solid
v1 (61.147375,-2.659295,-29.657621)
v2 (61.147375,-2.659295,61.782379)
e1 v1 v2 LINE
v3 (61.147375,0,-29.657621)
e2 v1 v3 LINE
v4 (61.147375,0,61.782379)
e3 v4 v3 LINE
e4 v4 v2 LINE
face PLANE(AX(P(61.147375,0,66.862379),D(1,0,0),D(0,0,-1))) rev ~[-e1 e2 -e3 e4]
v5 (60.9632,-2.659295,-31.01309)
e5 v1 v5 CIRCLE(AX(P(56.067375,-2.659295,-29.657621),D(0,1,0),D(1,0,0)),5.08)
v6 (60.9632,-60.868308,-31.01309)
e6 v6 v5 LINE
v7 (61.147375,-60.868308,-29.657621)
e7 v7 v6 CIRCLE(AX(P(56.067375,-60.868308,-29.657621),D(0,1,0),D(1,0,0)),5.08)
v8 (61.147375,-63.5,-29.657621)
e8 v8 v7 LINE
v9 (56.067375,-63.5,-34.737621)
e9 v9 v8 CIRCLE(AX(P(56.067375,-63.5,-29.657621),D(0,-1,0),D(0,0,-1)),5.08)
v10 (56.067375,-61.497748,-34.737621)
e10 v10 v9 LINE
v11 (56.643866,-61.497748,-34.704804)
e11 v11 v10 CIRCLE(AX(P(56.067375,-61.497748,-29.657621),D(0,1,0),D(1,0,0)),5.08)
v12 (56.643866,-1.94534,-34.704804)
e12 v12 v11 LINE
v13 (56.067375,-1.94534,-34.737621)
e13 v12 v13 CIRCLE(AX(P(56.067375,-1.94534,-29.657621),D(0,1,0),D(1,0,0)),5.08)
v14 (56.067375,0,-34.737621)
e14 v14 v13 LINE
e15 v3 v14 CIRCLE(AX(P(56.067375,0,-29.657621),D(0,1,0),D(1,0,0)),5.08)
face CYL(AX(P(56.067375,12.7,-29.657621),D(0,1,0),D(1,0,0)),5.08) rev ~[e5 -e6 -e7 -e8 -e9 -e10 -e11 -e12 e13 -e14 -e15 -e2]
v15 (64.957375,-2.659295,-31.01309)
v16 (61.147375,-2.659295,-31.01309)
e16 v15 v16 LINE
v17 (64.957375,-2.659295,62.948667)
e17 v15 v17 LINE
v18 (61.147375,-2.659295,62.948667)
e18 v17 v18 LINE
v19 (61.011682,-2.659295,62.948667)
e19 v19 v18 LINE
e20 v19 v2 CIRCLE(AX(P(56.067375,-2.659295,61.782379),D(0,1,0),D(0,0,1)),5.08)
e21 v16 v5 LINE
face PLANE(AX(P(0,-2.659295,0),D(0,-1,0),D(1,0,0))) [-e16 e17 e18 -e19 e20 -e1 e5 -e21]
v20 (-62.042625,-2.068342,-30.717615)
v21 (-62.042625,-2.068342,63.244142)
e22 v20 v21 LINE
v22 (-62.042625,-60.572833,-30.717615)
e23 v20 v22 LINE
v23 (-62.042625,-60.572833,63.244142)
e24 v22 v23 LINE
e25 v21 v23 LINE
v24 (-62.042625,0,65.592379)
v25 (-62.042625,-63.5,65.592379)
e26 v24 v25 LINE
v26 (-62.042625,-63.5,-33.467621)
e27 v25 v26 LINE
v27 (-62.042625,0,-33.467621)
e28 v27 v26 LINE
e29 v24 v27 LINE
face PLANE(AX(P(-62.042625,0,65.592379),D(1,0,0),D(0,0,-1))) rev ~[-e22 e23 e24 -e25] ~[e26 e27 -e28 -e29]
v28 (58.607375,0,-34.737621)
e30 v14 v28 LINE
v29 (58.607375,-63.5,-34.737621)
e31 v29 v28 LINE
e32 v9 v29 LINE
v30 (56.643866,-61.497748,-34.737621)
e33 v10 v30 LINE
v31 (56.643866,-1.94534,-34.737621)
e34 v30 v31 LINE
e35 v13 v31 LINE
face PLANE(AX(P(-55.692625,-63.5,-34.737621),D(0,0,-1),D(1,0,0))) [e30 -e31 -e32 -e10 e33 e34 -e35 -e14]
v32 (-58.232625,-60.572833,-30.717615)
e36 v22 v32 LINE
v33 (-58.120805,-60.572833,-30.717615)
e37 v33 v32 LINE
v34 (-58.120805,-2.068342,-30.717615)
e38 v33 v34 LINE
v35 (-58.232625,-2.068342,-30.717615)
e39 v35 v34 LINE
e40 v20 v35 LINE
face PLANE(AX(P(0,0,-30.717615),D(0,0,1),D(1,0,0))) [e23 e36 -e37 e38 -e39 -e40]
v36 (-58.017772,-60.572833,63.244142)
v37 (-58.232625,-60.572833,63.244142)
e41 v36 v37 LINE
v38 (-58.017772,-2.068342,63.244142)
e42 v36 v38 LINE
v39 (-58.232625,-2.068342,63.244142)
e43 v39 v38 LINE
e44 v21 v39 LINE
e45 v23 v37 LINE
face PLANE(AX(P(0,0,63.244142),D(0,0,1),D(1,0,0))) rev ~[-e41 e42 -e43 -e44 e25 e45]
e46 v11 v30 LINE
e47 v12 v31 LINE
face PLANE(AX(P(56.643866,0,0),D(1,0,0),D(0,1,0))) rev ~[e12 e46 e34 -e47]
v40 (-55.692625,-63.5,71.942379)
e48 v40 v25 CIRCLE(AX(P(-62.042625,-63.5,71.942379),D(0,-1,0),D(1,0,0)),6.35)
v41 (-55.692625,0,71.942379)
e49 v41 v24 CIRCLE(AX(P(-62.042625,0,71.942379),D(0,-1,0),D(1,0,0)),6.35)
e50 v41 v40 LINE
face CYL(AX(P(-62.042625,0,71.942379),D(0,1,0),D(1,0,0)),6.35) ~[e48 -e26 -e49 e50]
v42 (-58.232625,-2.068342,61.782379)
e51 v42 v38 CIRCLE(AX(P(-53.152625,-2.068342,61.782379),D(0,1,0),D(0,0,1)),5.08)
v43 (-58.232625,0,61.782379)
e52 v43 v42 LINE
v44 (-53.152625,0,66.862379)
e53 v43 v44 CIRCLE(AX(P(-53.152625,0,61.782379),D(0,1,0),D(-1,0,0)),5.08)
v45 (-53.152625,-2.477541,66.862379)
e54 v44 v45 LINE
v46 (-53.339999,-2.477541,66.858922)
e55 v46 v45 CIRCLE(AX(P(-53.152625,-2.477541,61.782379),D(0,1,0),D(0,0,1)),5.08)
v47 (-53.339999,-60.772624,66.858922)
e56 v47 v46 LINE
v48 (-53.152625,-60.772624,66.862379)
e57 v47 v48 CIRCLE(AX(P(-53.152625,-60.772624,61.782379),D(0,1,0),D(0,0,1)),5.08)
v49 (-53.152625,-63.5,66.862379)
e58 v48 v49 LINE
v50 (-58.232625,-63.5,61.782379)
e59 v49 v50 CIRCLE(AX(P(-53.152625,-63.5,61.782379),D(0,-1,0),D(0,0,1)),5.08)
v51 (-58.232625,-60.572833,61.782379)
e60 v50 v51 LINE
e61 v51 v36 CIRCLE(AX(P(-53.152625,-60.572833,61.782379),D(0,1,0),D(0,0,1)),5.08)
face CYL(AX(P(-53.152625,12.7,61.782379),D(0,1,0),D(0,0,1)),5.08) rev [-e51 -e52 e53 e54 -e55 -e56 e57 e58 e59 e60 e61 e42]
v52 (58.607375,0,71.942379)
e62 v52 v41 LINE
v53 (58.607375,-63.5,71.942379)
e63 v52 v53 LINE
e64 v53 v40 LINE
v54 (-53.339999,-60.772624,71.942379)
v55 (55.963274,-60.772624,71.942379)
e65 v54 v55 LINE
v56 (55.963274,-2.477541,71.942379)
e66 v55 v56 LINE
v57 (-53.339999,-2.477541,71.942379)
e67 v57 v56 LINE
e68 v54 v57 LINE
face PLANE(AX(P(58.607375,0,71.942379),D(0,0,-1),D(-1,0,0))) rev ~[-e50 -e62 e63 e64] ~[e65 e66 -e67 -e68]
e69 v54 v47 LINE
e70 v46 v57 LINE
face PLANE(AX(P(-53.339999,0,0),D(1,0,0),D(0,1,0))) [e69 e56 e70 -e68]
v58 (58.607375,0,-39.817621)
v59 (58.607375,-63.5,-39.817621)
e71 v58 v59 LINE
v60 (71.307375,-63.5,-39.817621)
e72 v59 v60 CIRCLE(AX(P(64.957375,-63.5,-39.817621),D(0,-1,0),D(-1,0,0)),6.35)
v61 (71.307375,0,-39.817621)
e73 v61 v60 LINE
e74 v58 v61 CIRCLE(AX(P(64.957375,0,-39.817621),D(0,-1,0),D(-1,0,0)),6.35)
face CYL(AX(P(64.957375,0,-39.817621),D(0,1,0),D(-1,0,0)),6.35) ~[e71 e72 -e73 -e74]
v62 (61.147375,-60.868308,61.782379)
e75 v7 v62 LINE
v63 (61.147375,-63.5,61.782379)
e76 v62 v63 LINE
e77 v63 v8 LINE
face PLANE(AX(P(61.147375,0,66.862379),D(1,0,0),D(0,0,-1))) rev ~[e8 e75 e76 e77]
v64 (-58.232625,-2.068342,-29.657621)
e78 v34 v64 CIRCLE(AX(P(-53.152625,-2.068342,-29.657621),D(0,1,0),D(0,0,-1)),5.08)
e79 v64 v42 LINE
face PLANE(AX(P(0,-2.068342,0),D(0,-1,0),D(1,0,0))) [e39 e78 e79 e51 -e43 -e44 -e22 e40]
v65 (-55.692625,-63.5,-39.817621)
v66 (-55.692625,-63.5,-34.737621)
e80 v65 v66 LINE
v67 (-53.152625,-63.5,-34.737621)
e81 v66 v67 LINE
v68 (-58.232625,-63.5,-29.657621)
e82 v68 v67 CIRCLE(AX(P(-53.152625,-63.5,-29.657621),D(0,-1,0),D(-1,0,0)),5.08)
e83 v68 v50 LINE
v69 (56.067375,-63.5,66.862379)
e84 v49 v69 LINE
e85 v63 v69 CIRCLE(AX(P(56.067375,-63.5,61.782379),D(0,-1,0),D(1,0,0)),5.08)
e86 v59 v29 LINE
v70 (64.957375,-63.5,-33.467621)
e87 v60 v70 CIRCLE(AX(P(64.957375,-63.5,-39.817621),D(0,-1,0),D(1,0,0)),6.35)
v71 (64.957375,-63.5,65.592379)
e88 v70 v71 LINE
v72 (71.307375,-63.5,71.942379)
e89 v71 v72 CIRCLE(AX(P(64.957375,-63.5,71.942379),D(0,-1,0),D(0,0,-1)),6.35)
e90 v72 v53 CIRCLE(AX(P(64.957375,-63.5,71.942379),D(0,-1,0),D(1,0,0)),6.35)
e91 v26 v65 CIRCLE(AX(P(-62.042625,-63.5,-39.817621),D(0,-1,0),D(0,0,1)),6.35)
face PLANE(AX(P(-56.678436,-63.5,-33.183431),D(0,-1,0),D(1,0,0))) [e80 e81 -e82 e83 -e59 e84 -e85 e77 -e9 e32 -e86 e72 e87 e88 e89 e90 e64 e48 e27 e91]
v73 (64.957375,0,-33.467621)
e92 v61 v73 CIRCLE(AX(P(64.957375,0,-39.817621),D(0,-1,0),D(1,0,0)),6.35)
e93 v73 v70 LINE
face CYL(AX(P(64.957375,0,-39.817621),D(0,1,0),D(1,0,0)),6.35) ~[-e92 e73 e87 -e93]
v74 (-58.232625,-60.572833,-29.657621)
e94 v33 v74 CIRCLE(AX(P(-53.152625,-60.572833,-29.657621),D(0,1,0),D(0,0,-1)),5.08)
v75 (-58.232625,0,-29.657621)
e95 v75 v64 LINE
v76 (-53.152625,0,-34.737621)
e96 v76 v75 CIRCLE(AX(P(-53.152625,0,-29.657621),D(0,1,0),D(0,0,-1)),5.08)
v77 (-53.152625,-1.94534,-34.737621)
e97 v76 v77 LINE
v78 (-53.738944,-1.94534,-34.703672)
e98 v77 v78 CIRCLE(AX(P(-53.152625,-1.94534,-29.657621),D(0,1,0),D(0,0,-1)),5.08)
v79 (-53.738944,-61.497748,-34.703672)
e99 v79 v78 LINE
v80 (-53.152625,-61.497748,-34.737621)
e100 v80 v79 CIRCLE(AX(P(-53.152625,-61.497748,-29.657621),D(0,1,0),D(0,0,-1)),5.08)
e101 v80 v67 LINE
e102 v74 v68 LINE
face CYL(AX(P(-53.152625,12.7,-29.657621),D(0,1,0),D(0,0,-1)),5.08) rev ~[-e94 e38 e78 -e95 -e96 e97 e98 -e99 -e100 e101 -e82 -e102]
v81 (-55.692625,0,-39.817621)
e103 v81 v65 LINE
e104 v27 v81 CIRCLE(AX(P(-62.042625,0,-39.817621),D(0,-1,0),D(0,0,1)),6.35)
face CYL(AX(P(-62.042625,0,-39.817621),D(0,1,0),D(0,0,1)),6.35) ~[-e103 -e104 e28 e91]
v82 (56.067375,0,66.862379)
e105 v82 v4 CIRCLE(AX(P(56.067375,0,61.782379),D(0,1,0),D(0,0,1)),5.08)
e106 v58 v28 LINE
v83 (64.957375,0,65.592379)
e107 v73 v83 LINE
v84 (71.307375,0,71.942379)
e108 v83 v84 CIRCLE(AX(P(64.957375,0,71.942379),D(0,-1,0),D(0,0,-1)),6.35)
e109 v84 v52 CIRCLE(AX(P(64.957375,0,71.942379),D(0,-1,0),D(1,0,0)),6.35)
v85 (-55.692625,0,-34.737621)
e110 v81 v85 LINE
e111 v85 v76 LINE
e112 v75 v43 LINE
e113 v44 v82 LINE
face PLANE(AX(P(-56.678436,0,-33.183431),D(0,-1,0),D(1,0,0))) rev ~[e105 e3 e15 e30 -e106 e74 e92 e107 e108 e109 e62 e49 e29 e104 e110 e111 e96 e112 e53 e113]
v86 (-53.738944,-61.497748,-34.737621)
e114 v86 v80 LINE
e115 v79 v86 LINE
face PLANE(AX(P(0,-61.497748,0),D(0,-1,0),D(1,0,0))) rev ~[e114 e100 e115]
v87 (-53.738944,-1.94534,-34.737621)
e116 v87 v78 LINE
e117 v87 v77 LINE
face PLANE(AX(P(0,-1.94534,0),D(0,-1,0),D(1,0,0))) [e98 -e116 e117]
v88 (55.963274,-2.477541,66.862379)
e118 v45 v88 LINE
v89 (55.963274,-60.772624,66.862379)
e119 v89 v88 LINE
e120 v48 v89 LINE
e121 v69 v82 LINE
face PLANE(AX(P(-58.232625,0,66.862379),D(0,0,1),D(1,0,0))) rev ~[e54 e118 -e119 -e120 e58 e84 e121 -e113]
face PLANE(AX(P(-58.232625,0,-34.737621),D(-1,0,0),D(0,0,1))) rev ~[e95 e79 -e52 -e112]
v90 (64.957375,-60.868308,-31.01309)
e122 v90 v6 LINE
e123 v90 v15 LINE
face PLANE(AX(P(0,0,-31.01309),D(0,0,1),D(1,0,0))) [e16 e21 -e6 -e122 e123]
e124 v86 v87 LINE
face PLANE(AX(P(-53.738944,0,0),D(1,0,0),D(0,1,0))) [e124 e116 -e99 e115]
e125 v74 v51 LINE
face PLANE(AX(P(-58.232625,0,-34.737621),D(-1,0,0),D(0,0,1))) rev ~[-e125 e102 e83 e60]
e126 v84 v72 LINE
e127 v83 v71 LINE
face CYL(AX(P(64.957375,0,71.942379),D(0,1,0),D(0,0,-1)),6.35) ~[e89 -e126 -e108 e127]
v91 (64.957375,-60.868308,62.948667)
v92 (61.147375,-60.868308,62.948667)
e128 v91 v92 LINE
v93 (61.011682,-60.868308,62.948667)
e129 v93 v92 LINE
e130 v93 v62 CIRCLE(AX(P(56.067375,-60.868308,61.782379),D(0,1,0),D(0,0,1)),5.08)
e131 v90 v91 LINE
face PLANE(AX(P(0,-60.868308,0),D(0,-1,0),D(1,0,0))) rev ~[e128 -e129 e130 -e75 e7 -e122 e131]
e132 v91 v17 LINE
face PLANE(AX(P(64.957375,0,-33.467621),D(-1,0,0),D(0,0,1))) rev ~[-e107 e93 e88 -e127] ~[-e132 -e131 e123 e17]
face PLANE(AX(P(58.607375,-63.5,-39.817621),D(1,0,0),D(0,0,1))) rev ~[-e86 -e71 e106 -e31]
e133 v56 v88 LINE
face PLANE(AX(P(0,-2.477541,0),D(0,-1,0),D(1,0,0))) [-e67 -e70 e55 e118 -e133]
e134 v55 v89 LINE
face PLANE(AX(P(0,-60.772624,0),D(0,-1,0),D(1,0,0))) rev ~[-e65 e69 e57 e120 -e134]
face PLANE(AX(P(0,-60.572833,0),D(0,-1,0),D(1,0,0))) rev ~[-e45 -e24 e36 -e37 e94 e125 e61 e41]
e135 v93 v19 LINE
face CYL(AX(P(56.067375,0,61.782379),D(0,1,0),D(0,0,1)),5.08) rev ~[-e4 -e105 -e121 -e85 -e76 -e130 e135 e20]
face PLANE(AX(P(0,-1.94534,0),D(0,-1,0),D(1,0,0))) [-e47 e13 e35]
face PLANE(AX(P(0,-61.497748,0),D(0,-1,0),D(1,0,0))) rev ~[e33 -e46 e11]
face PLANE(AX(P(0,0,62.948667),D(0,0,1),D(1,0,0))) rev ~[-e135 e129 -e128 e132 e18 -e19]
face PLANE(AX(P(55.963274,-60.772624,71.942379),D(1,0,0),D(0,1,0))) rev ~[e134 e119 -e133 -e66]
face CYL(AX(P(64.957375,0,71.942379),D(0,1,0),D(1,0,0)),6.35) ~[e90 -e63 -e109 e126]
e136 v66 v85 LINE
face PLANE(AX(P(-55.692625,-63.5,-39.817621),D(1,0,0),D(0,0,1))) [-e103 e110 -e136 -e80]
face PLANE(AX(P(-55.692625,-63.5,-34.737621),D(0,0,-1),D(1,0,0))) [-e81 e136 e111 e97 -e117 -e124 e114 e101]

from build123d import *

# Parameters (mm, degrees)
F1_DEPTH       = 63.5
F2_W           = 110.382810235
F2_H           = 59.5524079399
F3_DEPTH       = 25.4
F4_W           = 58.5044906475
F4_H           = 93.9617566764
F5_DEPTH       = 64.77
F6_W           = 109.3032732606
F6_H           = 58.2950827666
F7_DEPTH       = 52.832
F8_W           = 58.2090124954
F8_H           = 93.9617566764
F9_DEPTH       = 43.434
F10_T4_DEPTH   = 63.5
F10_T9_DEPTH   = 76.2
F10_T14_DEPTH  = 76.2
F10_T19_DEPTH  = 76.2
F10_T25_DEPTH  = 76.2
F10_T30_DEPTH  = 76.2
F10_T37_DEPTH  = 76.2
F10_T42_DEPTH  = 88.9
F10_T49_DEPTH  = 76.2
F10_T55_DEPTH  = 76.2
F10_T60_DEPTH  = 76.2
F10_T67_DEPTH  = 76.2
F10_T73_DEPTH  = 76.2
F10_T78_DEPTH  = 76.2
F10_T83_DEPTH  = 76.2
F10_T90_DEPTH  = 88.9
F10_T97_DEPTH  = 76.2
F10_T102_DEPTH = 88.9
F11_W          = 114.3
F11_H          = 5.08
F12_DEPTH      = 127.254


# Not quite as in the source:
# - a fillet or chamfer that OpenCascade refuses, or shapes differently, is made with other operations: its cross-section is extruded or revolved along the edge and cut away or added


with BuildPart() as f1:
    # F0 (on Front) → F1 (new body)
    with BuildSketch(Plane.XZ):
        with BuildLine():
            Line((-62.042625457, -33.4676207812), (-62.042625457, -39.8176207812))
            Line((-62.042625457, -39.8176207812), (-55.692625457, -39.8176207812))
            ThreePointArc((-55.692625457, -39.8176207812), (-56.3630127942, -36.9778144498), (-58.232625457, -34.7376207812))
            ThreePointArc((-58.232625457, -34.7376207812), (-60.0345791428, -33.7934818386), (-62.042625457, -33.4676207812))
        make_face()
        with BuildLine():
            Line((-55.692625457, -39.8176207812), (-62.042625457, -39.8176207812))
            Line((-62.042625457, -39.8176207812), (-62.042625457, -33.4676207812))
            ThreePointArc((-62.042625457, -33.4676207812), (-66.5327535176, -44.3077488417), (-55.692625457, -39.8176207812))
        make_face()
        with BuildLine():
            ThreePointArc((-58.232625457, -34.7376207812), (-56.3630127942, -36.9778144498), (-55.692625457, -39.8176207812))
            Line((-55.692625457, -39.8176207812), (58.607374543, -39.8176207812))
            ThreePointArc((58.607374543, -39.8176207812), (59.2777618801, -36.9778144498), (61.147374543, -34.7376207812))
            Line((61.147374543, -34.7376207812), (-58.232625457, -34.7376207812))
        make_face()
        with BuildLine():
            Line((-62.042625457, 65.5923792188), (-62.042625457, -33.4676207812))
            ThreePointArc((-62.042625457, -33.4676207812), (-60.0345791428, -33.7934818386), (-58.232625457, -34.7376207812))
            Line((-58.232625457, -34.7376207812), (-58.232625457, 66.8623792188))
            ThreePointArc((-58.232625457, 66.8623792188), (-60.0345791428, 65.9182402762), (-62.042625457, 65.5923792188))
        make_face()
        with BuildLine():
            ThreePointArc((61.147374543, -34.7376207812), (59.2777618801, -36.9778144498), (58.607374543, -39.8176207812))
            Line((58.607374543, -39.8176207812), (64.957374543, -39.8176207812))
            Line((64.957374543, -39.8176207812), (64.957374543, -33.4676207812))
            ThreePointArc((64.957374543, -33.4676207812), (62.9493282287, -33.7934818386), (61.147374543, -34.7376207812))
        make_face()
        with BuildLine():
            Line((64.957374543, -39.8176207812), (58.607374543, -39.8176207812))
            ThreePointArc((58.607374543, -39.8176207812), (64.957374543, -46.1676207812), (71.307374543, -39.8176207812))
            ThreePointArc((71.307374543, -39.8176207812), (69.4475026035, -35.3274927207), (64.957374543, -33.4676207812))
            Line((64.957374543, -33.4676207812), (64.957374543, -39.8176207812))
        make_face()
        with BuildLine():
            ThreePointArc((-55.692625457, 71.9423792188), (-66.5327535176, 76.4325072793), (-62.042625457, 65.5923792188))
            Line((-62.042625457, 65.5923792188), (-62.042625457, 71.9423792188))
            Line((-62.042625457, 71.9423792188), (-55.692625457, 71.9423792188))
        make_face()
        with BuildLine():
            Line((-62.042625457, 71.9423792188), (-62.042625457, 65.5923792188))
            ThreePointArc((-62.042625457, 65.5923792188), (-60.0345791428, 65.9182402762), (-58.232625457, 66.8623792188))
            ThreePointArc((-58.232625457, 66.8623792188), (-56.3630127942, 69.1025728874), (-55.692625457, 71.9423792188))
            Line((-55.692625457, 71.9423792188), (-62.042625457, 71.9423792188))
        make_face()
        with BuildLine():
            Line((61.147374543, 66.8623792188), (61.147374543, -34.7376207812))
            ThreePointArc((61.147374543, -34.7376207812), (62.9493282287, -33.7934818386), (64.957374543, -33.4676207812))
            Line((64.957374543, -33.4676207812), (64.957374543, 65.5923792188))
            ThreePointArc((64.957374543, 65.5923792188), (62.9493282287, 65.9182402762), (61.147374543, 66.8623792188))
        make_face()
        with BuildLine():
            ThreePointArc((-55.692625457, 71.9423792188), (-56.3630127942, 69.1025728874), (-58.232625457, 66.8623792188))
            Line((-58.232625457, 66.8623792188), (61.147374543, 66.8623792188))
            ThreePointArc((61.147374543, 66.8623792188), (59.2777618801, 69.1025728874), (58.607374543, 71.9423792188))
            Line((58.607374543, 71.9423792188), (-55.692625457, 71.9423792188))
        make_face()
        with BuildLine():
            ThreePointArc((58.607374543, 71.9423792188), (59.2777618801, 69.1025728874), (61.147374543, 66.8623792188))
            ThreePointArc((61.147374543, 66.8623792188), (62.9493282287, 65.9182402762), (64.957374543, 65.5923792188))
            Line((64.957374543, 65.5923792188), (64.957374543, 71.9423792188))
            Line((64.957374543, 71.9423792188), (58.607374543, 71.9423792188))
        make_face()
        with BuildLine():
            ThreePointArc((71.307374543, 71.9423792188), (64.957374543, 78.2923792188), (58.607374543, 71.9423792188))
            Line((58.607374543, 71.9423792188), (64.957374543, 71.9423792188))
            Line((64.957374543, 71.9423792188), (64.957374543, 65.5923792188))
            ThreePointArc((64.957374543, 65.5923792188), (69.4475026035, 67.4522511583), (71.307374543, 71.9423792188))
        make_face()
    extrude(amount=F1_DEPTH)

    # F2 (on face) → F3 (cut)
    with BuildSketch(Plane(origin=(0, 0, -39.8176207812), x_dir=(1, 0, 0), z_dir=(0, 0, -1))):
        with Locations((1.452460885, 31.7215439281)):
            Rectangle(F2_W, F2_H)
    extrude(amount=-F3_DEPTH, mode=Mode.SUBTRACT)

    # F4 (on face) → F5 (cut)
    with BuildSketch(Plane(origin=(-62.042625457, 0, 0), x_dir=(0, -1, 0), z_dir=(-1, 0, 0))):
        with Locations((31.3205874991, 16.2632633001)):
            Rectangle(F4_W, F4_H)
    extrude(amount=-F5_DEPTH, mode=Mode.SUBTRACT)

    # F6 (on face) → F7 (cut)
    with BuildSketch(Plane.XY.offset(71.9423792188)):
        with Locations((1.3116374612, -31.6250824835)):
            Rectangle(F6_W, F6_H)
    extrude(amount=-F7_DEPTH, mode=Mode.SUBTRACT)

    # F8 (on face) → F9 (cut)
    with BuildSketch(Plane.YZ.offset(64.957374543)):
        with Locations((-31.7638017004, 15.9677881747)):
            Rectangle(F8_W, F8_H)
    extrude(amount=-F9_DEPTH, mode=Mode.SUBTRACT)

    # F10: fillet of radius 5.08 on 4 edges, made by hand


with BuildPart() as f10_tool2:
    # F10_s3 → F10_t4 (new body)
    with BuildSketch(Plane.XZ):
        with BuildLine():
            ThreePointArc((56.067374543, 66.8623792188), (59.6594769914, 65.3744816672), (61.147374543, 61.7823792188))
            Line((61.147374543, 61.7823792188), (61.147374543, 66.8623792188))
            Line((61.147374543, 66.8623792188), (56.067374543, 66.8623792188))
        make_face()
    extrude(amount=F10_T4_DEPTH)

    split(bisect_by=Plane.XY.offset(62.948666513), keep=Keep.TOP)


with BuildPart() as f1_1:
    add(f1.part)

    # F10_t1: union F10_tool2
    add(f10_tool2.part)


with BuildPart() as f10_tool7:
    # F10_s8 → F10_t9 (new body)
    with BuildSketch(Plane.XZ):
        with BuildLine():
            ThreePointArc((56.067374543, 66.8623792188), (59.6594769914, 65.3744816672), (61.147374543, 61.7823792188))
            Line((61.147374543, 61.7823792188), (61.147374543, 66.8623792188))
            Line((61.147374543, 66.8623792188), (56.067374543, 66.8623792188))
        make_face()
    extrude(amount=F10_T9_DEPTH)

    split(bisect_by=Plane.XZ.offset(2.6592954528), keep=Keep.BOTTOM)


with BuildPart() as f1_2:
    add(f1_1.part)

    # F10_t6: union F10_tool7
    add(f10_tool7.part)


with BuildPart() as f10_tool12:
    # F10_s13 → F10_t14 (new body)
    with BuildSketch(Plane.XZ.offset(-12.7)):
        with BuildLine():
            ThreePointArc((56.067374543, 66.8623792188), (59.6594769914, 65.3744816672), (61.147374543, 61.7823792188))
            Line((61.147374543, 61.7823792188), (61.147374543, 66.8623792188))
            Line((61.147374543, 66.8623792188), (56.067374543, 66.8623792188))
        make_face()
    extrude(amount=F10_T14_DEPTH)

    split(bisect_by=Plane.XZ.offset(60.8683079481), keep=Keep.TOP)


with BuildPart() as f1_3:
    add(f1_2.part)

    # F10_t11: union F10_tool12
    add(f10_tool12.part)


with BuildPart() as f10_tool17:
    # F10_s18 → F10_t19 (new body)
    with BuildSketch(Plane.XZ):
        with BuildLine():
            ThreePointArc((-53.152625457, 66.8623792188), (-56.7447279055, 65.3744816672), (-58.232625457, 61.7823792188))
            Line((-58.232625457, 61.7823792188), (-58.232625457, 66.8623792188))
            Line((-58.232625457, 66.8623792188), (-53.152625457, 66.8623792188))
        make_face()
    extrude(amount=F10_T19_DEPTH)

    split(bisect_by=Plane.XZ.offset(2.4775411002), keep=Keep.BOTTOM)

    split(bisect_by=Plane.XY.offset(63.2441416383), keep=Keep.TOP)


with BuildPart() as f1_4:
    add(f1_3.part)

    # F10_t16: union F10_tool17
    add(f10_tool17.part)


with BuildPart() as f10_tool23:
    # F10_s24 → F10_t25 (new body)
    with BuildSketch(Plane.XZ):
        with BuildLine():
            ThreePointArc((-53.152625457, 66.8623792188), (-56.7447279055, 65.3744816672), (-58.232625457, 61.7823792188))
            Line((-58.232625457, 61.7823792188), (-58.232625457, 66.8623792188))
            Line((-58.232625457, 66.8623792188), (-53.152625457, 66.8623792188))
        make_face()
    extrude(amount=F10_T25_DEPTH)

    split(bisect_by=Plane.XZ.offset(2.0683421753), keep=Keep.BOTTOM)


with BuildPart() as f1_5:
    add(f1_4.part)

    # F10_t22: union F10_tool23
    add(f10_tool23.part)


with BuildPart() as f10_tool28:
    # F10_s29 → F10_t30 (new body)
    with BuildSketch(Plane.XZ.offset(-12.7)):
        with BuildLine():
            ThreePointArc((-53.152625457, 66.8623792188), (-56.7447279055, 65.3744816672), (-58.232625457, 61.7823792188))
            Line((-58.232625457, 61.7823792188), (-58.232625457, 66.8623792188))
            Line((-58.232625457, 66.8623792188), (-53.152625457, 66.8623792188))
        make_face()
    extrude(amount=F10_T30_DEPTH)

    split(bisect_by=Plane.YZ.offset(-53.3399991691), keep=Keep.BOTTOM)

    split(bisect_by=Plane.XZ.offset(2.0683421753), keep=Keep.TOP)

    split(bisect_by=Plane.XY.offset(63.2441416383), keep=Keep.TOP)


with BuildPart() as f1_6:
    add(f1_5.part)

    # F10_t27: union F10_tool28
    add(f10_tool28.part)


with BuildPart() as f10_tool35:
    # F10_s36 → F10_t37 (new body)
    with BuildSketch(Plane.XZ.offset(-12.7)):
        with BuildLine():
            ThreePointArc((-53.152625457, 66.8623792188), (-56.7447279055, 65.3744816672), (-58.232625457, 61.7823792188))
            Line((-58.232625457, 61.7823792188), (-58.232625457, 66.8623792188))
            Line((-58.232625457, 66.8623792188), (-53.152625457, 66.8623792188))
        make_face()
    extrude(amount=F10_T37_DEPTH)

    split(bisect_by=Plane.XZ.offset(60.7726238668), keep=Keep.TOP)


with BuildPart() as f1_7:
    add(f1_6.part)

    # F10_t34: union F10_tool35
    add(f10_tool35.part)


with BuildPart() as f10_tool40:
    # F10_s41 → F10_t42 (new body)
    with BuildSketch(Plane.XZ.offset(-12.7)):
        with BuildLine():
            ThreePointArc((-53.152625457, 66.8623792188), (-56.7447279055, 65.3744816672), (-58.232625457, 61.7823792188))
            Line((-58.232625457, 61.7823792188), (-58.232625457, 66.8623792188))
            Line((-58.232625457, 66.8623792188), (-53.152625457, 66.8623792188))
        make_face()
    extrude(amount=F10_T42_DEPTH)

    split(bisect_by=Plane.XZ.offset(60.7726238668), keep=Keep.BOTTOM)

    split(bisect_by=Plane.XZ.offset(60.5728328228), keep=Keep.TOP)

    split(bisect_by=Plane.XY.offset(63.2441416383), keep=Keep.BOTTOM)


with BuildPart() as f1_8:
    add(f1_7.part)

    # F10_t39: union F10_tool40
    add(f10_tool40.part)


with BuildPart() as f10_tool47:
    # F10_s48 → F10_t49 (new body)
    with BuildSketch(Plane.XZ):
        with BuildLine():
            ThreePointArc((61.147374543, -29.6576207812), (59.6594769914, -33.2497232296), (56.067374543, -34.7376207812))
            Line((56.067374543, -34.7376207812), (61.147374543, -34.7376207812))
            Line((61.147374543, -34.7376207812), (61.147374543, -29.6576207812))
        make_face()
    extrude(amount=F10_T49_DEPTH)

    split(bisect_by=Plane.XZ.offset(2.6592954528), keep=Keep.BOTTOM)

    split(bisect_by=Plane.YZ.offset(56.6438660026), keep=Keep.TOP)


with BuildPart() as f1_9:
    add(f1_8.part)

    # F10_t46: union F10_tool47
    add(f10_tool47.part)


with BuildPart() as f10_tool53:
    # F10_s54 → F10_t55 (new body)
    with BuildSketch(Plane.XZ):
        with BuildLine():
            ThreePointArc((61.147374543, -29.6576207812), (59.6594769914, -33.2497232296), (56.067374543, -34.7376207812))
            Line((56.067374543, -34.7376207812), (61.147374543, -34.7376207812))
            Line((61.147374543, -34.7376207812), (61.147374543, -29.6576207812))
        make_face()
    extrude(amount=F10_T55_DEPTH)

    split(bisect_by=Plane.XZ.offset(1.9453399582), keep=Keep.BOTTOM)


with BuildPart() as f1_10:
    add(f1_9.part)

    # F10_t52: union F10_tool53
    add(f10_tool53.part)


with BuildPart() as f10_tool58:
    # F10_s59 → F10_t60 (new body)
    with BuildSketch(Plane.XZ.offset(-12.7)):
        with BuildLine():
            ThreePointArc((61.147374543, -29.6576207812), (59.6594769914, -33.2497232296), (56.067374543, -34.7376207812))
            Line((56.067374543, -34.7376207812), (61.147374543, -34.7376207812))
            Line((61.147374543, -34.7376207812), (61.147374543, -29.6576207812))
        make_face()
    extrude(amount=F10_T60_DEPTH)

    split(bisect_by=Plane.XY.offset(-31.0130901635), keep=Keep.BOTTOM)

    split(bisect_by=Plane.YZ.offset(56.6438660026), keep=Keep.TOP)

    split(bisect_by=Plane.XZ.offset(1.9453399582), keep=Keep.TOP)


with BuildPart() as f1_11:
    add(f1_10.part)

    # F10_t57: union F10_tool58
    add(f10_tool58.part)


with BuildPart() as f10_tool65:
    # F10_s66 → F10_t67 (new body)
    with BuildSketch(Plane.XZ.offset(-12.7)):
        with BuildLine():
            ThreePointArc((61.147374543, -29.6576207812), (59.6594769914, -33.2497232296), (56.067374543, -34.7376207812))
            Line((56.067374543, -34.7376207812), (61.147374543, -34.7376207812))
            Line((61.147374543, -34.7376207812), (61.147374543, -29.6576207812))
        make_face()
    extrude(amount=F10_T67_DEPTH)

    split(bisect_by=Plane.XZ.offset(60.8683079481), keep=Keep.TOP)

    split(bisect_by=Plane.YZ.offset(56.6438660026), keep=Keep.TOP)


with BuildPart() as f1_12:
    add(f1_11.part)

    # F10_t64: union F10_tool65
    add(f10_tool65.part)


with BuildPart() as f10_tool71:
    # F10_s72 → F10_t73 (new body)
    with BuildSketch(Plane.XZ.offset(-12.7)):
        with BuildLine():
            ThreePointArc((61.147374543, -29.6576207812), (59.6594769914, -33.2497232296), (56.067374543, -34.7376207812))
            Line((56.067374543, -34.7376207812), (61.147374543, -34.7376207812))
            Line((61.147374543, -34.7376207812), (61.147374543, -29.6576207812))
        make_face()
    extrude(amount=F10_T73_DEPTH)

    split(bisect_by=Plane.XZ.offset(61.4977478981), keep=Keep.TOP)


with BuildPart() as f1_13:
    add(f1_12.part)

    # F10_t70: union F10_tool71
    add(f10_tool71.part)


with BuildPart() as f10_tool76:
    # F10_s77 → F10_t78 (new body)
    with BuildSketch(Plane.XZ):
        with BuildLine():
            ThreePointArc((-53.152625457, -34.7376207812), (-56.7447279055, -33.2497232296), (-58.232625457, -29.6576207812))
            Line((-58.232625457, -29.6576207812), (-58.232625457, -34.7376207812))
            Line((-58.232625457, -34.7376207812), (-53.152625457, -34.7376207812))
        make_face()
    extrude(amount=F10_T78_DEPTH)

    split(bisect_by=Plane.XZ.offset(1.9453399582), keep=Keep.BOTTOM)


with BuildPart() as f1_14:
    add(f1_13.part)

    # F10_t75: union F10_tool76
    add(f10_tool76.part)


with BuildPart() as f10_tool81:
    # F10_s82 → F10_t83 (new body)
    with BuildSketch(Plane.XZ.offset(-12.7)):
        with BuildLine():
            ThreePointArc((-53.152625457, -34.7376207812), (-56.7447279055, -33.2497232296), (-58.232625457, -29.6576207812))
            Line((-58.232625457, -29.6576207812), (-58.232625457, -34.7376207812))
            Line((-58.232625457, -34.7376207812), (-53.152625457, -34.7376207812))
        make_face()
    extrude(amount=F10_T83_DEPTH)

    split(bisect_by=Plane.XZ.offset(1.9453399582), keep=Keep.TOP)

    split(bisect_by=Plane.YZ.offset(-53.7389442325), keep=Keep.BOTTOM)

    split(bisect_by=Plane.XY.offset(-30.7176150382), keep=Keep.BOTTOM)


with BuildPart() as f1_15:
    add(f1_14.part)

    # F10_t80: union F10_tool81
    add(f10_tool81.part)


with BuildPart() as f10_tool88:
    # F10_s89 → F10_t90 (new body)
    with BuildSketch(Plane.XZ.offset(-12.7)):
        with BuildLine():
            ThreePointArc((-53.152625457, -34.7376207812), (-56.7447279055, -33.2497232296), (-58.232625457, -29.6576207812))
            Line((-58.232625457, -29.6576207812), (-58.232625457, -34.7376207812))
            Line((-58.232625457, -34.7376207812), (-53.152625457, -34.7376207812))
        make_face()
    extrude(amount=F10_T90_DEPTH)

    split(bisect_by=Plane.XZ.offset(1.9453399582), keep=Keep.TOP)

    split(bisect_by=Plane.XY.offset(-30.7176150382), keep=Keep.TOP)

    split(bisect_by=Plane.XZ.offset(2.0683421753), keep=Keep.BOTTOM)


with BuildPart() as f1_16:
    add(f1_15.part)

    # F10_t87: union F10_tool88
    add(f10_tool88.part)


with BuildPart() as f10_tool95:
    # F10_s96 → F10_t97 (new body)
    with BuildSketch(Plane.XZ.offset(-12.7)):
        with BuildLine():
            ThreePointArc((-53.152625457, -34.7376207812), (-56.7447279055, -33.2497232296), (-58.232625457, -29.6576207812))
            Line((-58.232625457, -29.6576207812), (-58.232625457, -34.7376207812))
            Line((-58.232625457, -34.7376207812), (-53.152625457, -34.7376207812))
        make_face()
    extrude(amount=F10_T97_DEPTH)

    split(bisect_by=Plane.XZ.offset(61.4977478981), keep=Keep.TOP)


with BuildPart() as f1_17:
    add(f1_16.part)

    # F10_t94: union F10_tool95
    add(f10_tool95.part)


with BuildPart() as f10_tool100:
    # F10_s101 → F10_t102 (new body)
    with BuildSketch(Plane.XZ.offset(-12.7)):
        with BuildLine():
            ThreePointArc((-53.152625457, -34.7376207812), (-56.7447279055, -33.2497232296), (-58.232625457, -29.6576207812))
            Line((-58.232625457, -29.6576207812), (-58.232625457, -34.7376207812))
            Line((-58.232625457, -34.7376207812), (-53.152625457, -34.7376207812))
        make_face()
    extrude(amount=F10_T102_DEPTH)

    split(bisect_by=Plane.XZ.offset(61.4977478981), keep=Keep.BOTTOM)

    split(bisect_by=Plane.XZ.offset(60.5728328228), keep=Keep.TOP)

    split(bisect_by=Plane.XY.offset(-30.7176150382), keep=Keep.TOP)


with BuildPart() as f1_18:
    add(f1_17.part)

    # F10_t99: union F10_tool100
    add(f10_tool100.part)

    # F11 (on face) → F12 (cut)
    with BuildSketch(Plane.XZ.offset(63.5)):
        with Locations((1.457374543, -37.2776207812)):
            Rectangle(F11_W, F11_H)
    extrude(amount=-F12_DEPTH, mode=Mode.SUBTRACT)


solid = f1_18.part
